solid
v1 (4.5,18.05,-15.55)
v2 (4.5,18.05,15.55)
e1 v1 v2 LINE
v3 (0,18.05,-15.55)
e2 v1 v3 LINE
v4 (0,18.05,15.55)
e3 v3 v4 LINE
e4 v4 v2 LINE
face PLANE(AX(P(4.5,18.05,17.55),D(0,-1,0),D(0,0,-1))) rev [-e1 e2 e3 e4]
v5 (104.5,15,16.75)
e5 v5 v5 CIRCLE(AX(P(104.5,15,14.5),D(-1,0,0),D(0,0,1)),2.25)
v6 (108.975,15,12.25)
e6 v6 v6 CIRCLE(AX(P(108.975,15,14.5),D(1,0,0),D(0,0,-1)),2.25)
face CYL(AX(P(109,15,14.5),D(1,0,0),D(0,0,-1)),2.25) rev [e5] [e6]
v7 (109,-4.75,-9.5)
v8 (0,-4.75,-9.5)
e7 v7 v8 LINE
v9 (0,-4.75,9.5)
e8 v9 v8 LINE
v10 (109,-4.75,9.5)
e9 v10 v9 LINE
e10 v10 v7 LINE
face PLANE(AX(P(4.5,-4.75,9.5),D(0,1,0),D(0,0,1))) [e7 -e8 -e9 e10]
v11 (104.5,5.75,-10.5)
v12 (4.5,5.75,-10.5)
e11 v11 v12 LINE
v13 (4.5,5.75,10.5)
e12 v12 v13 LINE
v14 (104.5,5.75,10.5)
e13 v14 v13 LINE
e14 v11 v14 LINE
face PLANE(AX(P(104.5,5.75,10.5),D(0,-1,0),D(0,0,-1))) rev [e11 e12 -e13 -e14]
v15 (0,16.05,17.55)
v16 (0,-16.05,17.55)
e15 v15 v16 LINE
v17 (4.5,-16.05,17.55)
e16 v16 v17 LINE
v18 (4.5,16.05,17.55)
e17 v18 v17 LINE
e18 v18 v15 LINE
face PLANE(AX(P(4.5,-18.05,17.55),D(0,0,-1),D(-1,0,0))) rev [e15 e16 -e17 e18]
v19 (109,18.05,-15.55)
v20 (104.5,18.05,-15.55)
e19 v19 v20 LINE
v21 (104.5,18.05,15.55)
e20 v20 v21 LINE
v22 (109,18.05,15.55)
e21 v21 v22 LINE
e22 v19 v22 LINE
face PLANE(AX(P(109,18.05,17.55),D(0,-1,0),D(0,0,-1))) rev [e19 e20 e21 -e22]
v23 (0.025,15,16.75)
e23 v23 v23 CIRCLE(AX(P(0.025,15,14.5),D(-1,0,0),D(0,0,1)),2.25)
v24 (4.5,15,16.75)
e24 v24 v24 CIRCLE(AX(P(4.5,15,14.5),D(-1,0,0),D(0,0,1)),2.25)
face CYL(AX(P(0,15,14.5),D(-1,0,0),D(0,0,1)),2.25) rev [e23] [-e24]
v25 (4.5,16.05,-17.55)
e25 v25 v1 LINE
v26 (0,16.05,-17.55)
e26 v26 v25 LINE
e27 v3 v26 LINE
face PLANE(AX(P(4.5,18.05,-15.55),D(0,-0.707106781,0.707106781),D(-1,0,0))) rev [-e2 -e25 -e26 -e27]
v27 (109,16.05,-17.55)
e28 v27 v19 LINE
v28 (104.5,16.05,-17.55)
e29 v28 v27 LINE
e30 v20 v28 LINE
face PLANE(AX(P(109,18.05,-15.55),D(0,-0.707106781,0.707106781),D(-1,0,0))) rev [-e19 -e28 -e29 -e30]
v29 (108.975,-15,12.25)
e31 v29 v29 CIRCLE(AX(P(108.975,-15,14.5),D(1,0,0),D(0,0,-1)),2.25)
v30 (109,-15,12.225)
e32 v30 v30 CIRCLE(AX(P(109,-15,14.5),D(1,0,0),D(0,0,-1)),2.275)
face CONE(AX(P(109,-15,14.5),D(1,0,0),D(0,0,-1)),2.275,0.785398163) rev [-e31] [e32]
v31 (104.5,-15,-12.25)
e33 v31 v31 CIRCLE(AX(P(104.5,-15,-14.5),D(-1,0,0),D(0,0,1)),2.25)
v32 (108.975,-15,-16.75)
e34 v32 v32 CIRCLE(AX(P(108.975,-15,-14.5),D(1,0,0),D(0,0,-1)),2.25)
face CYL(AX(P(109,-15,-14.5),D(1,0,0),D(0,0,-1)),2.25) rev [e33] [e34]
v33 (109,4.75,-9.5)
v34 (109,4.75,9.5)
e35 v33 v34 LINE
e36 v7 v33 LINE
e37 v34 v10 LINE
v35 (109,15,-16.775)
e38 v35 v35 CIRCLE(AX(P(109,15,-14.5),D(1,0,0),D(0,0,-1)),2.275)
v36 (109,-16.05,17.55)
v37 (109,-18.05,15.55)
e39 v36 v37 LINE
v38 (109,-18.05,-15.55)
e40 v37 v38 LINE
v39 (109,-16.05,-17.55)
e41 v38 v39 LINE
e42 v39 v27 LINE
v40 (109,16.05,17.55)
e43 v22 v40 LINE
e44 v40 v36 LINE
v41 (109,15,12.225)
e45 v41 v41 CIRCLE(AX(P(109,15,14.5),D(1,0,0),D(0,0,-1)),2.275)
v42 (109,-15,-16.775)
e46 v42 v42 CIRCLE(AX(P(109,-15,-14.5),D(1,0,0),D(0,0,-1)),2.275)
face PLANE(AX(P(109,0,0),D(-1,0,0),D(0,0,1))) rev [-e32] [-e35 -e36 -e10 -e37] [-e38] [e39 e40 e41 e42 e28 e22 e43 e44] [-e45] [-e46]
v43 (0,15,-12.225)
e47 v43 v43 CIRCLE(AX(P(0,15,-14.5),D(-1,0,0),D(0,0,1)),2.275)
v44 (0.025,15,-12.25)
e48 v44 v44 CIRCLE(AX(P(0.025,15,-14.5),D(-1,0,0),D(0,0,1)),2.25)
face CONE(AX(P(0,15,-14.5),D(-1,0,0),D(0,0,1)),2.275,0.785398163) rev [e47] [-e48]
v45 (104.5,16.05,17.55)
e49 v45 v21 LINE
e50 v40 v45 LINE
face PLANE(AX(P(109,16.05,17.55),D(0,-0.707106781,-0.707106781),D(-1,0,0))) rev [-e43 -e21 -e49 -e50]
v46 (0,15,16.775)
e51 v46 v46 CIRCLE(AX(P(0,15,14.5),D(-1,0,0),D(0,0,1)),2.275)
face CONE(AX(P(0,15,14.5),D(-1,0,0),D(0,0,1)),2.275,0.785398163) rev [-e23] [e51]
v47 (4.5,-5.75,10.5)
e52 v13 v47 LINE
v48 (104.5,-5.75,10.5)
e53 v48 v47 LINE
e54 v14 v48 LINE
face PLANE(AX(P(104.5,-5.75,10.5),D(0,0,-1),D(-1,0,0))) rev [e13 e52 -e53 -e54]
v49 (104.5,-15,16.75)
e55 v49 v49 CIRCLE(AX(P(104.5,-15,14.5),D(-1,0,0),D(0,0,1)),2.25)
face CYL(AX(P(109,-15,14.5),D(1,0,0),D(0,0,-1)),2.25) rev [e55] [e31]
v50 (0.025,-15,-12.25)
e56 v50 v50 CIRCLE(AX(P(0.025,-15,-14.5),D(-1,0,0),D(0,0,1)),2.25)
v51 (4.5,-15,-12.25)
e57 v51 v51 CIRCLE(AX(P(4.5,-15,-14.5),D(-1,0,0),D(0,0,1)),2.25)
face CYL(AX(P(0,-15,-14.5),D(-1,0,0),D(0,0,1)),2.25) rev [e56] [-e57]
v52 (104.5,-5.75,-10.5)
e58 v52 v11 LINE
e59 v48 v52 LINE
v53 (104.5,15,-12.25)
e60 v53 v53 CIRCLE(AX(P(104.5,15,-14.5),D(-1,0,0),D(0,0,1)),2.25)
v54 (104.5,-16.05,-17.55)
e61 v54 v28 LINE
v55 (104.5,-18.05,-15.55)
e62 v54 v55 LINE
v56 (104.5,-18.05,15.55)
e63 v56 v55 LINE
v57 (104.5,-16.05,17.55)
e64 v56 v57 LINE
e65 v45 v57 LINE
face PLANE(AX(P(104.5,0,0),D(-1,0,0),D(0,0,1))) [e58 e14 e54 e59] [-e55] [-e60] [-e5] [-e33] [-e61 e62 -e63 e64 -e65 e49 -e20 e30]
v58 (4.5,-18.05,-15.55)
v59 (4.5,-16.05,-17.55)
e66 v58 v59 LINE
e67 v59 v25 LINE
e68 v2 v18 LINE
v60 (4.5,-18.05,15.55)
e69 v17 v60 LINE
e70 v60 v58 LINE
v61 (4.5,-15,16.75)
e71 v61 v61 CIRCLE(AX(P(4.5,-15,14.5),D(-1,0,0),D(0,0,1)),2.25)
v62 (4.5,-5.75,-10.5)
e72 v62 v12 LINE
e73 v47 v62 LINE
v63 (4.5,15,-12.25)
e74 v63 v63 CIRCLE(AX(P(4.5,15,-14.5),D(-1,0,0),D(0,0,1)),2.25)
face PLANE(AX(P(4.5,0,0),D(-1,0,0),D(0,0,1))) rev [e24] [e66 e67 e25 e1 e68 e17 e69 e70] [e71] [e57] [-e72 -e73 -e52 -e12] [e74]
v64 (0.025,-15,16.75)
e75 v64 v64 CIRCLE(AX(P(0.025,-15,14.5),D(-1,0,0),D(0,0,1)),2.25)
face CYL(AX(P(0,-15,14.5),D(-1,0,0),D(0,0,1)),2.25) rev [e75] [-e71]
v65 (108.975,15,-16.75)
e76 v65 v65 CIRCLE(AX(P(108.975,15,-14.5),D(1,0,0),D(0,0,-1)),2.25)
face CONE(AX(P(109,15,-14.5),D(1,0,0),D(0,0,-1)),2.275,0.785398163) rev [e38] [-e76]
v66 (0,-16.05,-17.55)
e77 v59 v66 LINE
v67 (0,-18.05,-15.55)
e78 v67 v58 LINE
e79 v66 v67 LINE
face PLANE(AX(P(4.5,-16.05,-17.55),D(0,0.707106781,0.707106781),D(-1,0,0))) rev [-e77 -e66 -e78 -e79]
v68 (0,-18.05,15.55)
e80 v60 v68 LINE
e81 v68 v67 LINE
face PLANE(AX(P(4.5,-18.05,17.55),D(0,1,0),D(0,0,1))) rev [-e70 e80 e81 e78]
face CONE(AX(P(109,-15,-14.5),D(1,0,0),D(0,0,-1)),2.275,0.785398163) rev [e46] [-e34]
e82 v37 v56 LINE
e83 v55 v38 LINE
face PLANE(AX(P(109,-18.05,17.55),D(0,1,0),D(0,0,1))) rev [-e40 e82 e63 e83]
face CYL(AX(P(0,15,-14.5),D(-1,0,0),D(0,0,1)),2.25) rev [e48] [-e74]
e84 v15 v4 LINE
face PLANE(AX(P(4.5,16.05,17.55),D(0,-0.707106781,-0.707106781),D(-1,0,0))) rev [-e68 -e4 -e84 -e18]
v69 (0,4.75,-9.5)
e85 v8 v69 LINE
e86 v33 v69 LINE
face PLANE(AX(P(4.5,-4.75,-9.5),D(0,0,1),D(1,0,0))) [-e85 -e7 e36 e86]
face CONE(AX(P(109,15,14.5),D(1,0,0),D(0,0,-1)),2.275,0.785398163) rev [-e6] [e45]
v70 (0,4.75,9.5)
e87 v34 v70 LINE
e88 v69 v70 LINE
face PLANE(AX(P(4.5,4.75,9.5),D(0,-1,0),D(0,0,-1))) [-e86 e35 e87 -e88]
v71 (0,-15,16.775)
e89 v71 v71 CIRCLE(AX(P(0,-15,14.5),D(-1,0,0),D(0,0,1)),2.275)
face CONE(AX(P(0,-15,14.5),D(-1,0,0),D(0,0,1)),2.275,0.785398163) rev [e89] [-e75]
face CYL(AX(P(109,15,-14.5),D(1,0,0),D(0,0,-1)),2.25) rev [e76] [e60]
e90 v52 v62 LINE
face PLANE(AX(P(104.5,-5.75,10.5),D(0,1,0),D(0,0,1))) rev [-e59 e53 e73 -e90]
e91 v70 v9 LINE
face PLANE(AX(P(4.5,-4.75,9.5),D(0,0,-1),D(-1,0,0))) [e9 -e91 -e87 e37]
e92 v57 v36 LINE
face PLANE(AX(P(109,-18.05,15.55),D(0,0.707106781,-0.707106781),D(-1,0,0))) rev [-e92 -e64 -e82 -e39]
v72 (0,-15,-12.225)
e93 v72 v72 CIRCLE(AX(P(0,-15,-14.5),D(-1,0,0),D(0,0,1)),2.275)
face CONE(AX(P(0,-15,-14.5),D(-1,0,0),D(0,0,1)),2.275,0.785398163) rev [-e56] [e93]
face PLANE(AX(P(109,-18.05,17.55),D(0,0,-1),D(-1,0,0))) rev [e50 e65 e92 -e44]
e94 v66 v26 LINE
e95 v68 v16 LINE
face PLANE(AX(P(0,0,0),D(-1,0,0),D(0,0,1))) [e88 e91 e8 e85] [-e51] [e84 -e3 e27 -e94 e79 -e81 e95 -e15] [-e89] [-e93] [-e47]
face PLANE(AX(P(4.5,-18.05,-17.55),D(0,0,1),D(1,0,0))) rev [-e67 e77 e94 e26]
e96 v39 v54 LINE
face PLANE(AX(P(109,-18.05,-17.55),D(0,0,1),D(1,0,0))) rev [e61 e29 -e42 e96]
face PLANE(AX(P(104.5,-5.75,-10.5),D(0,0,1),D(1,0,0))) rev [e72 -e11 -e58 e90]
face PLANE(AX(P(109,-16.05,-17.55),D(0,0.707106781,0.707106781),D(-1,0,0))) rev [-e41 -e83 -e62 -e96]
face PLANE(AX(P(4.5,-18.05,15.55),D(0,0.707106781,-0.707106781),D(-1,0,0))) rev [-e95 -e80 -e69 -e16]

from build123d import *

# Parameters (mm, degrees)
SKETCH_1_W                  = 35.1
SKETCH_1_H                  = 36.1
SKETCH_1_W_2                = 19
SKETCH_1_H_2                = 9.5
EXTRUDE_1_DEPTH             = 4.5
CHAMFER_1_SIZE              = 2
SKETCH_4_W                  = 21
SKETCH_4_H                  = 11.5
SKETCH_4_W_2                = 19
SKETCH_4_H_2                = 9.5
EXTRUDE_2_DEPTH             = 100
SKETCH_5_W                  = 35.1
SKETCH_5_H                  = 36.1
SKETCH_5_W_2                = 19
SKETCH_5_H_2                = 9.5
EXTRUDE_3_DEPTH             = 4.5
CHAMFER_2_SIZE              = 2
PATTERN_LINEAR_1_COUNT      = 2
PATTERN_LINEAR_1_PITCH      = 29
PATTERN_LINEAR_1_COUNT_DIR2 = 2
PATTERN_LINEAR_1_PITCH_DIR2 = 30
HOLE_WIZARD_M42_D           = 4.5
HOLE_WIZARD_M42_CSINK_D     = 4.55
HOLE_WIZARD_M42_CSINK_ANGLE = 90


# Read off the part's stored shape, not the designer's step: Отверстие с зазором M41
with BuildPart() as part:
    # Эскиз1 → Бобышка-Вытянуть1 (new body)
    with BuildSketch(Plane(origin=(0, 0, 0), x_dir=(0, 0, -1), z_dir=(1, 0, 0))):
        Rectangle(SKETCH_1_W, SKETCH_1_H)
        Rectangle(SKETCH_1_W_2, SKETCH_1_H_2, mode=Mode.SUBTRACT)
    extrude(amount=EXTRUDE_1_DEPTH)

    # Фаска1
    chamfer_1_edges = [part.edges().sort_by_distance(p)[0] for p in [
        (2.25, -18.05, -17.55),
        (2.25, -18.05, 17.55),
        (2.25, 18.05, 17.55),
        (2.25, 18.05, -17.55),
    ]]
    chamfer(chamfer_1_edges, length=CHAMFER_1_SIZE)

    # Эскиз4 → Бобышка-Вытянуть2 (add)
    with BuildSketch(Plane(origin=(4.5, 0, 0), x_dir=(0, 0, -1), z_dir=(1, 0, 0))):
        Rectangle(SKETCH_4_W, SKETCH_4_H)
        Rectangle(SKETCH_4_W_2, SKETCH_4_H_2, mode=Mode.SUBTRACT)
    extrude(amount=EXTRUDE_2_DEPTH)

    # Эскиз5 → Бобышка-Вытянуть3 (add)
    with BuildSketch(Plane(origin=(104.5, 0, 0), x_dir=(0, 0, -1), z_dir=(1, 0, 0))):
        Rectangle(SKETCH_5_W, SKETCH_5_H)
        Rectangle(SKETCH_5_W_2, SKETCH_5_H_2, mode=Mode.SUBTRACT)
    extrude(amount=EXTRUDE_3_DEPTH)

    # Фаска2
    chamfer_2_edges = [part.edges().sort_by_distance(p)[0] for p in [
        (106.75, -18.05, -17.55),
        (106.75, 18.05, -17.55),
        (106.75, 18.05, 17.55),
        (106.75, -18.05, 17.55),
    ]]
    chamfer(chamfer_2_edges, length=CHAMFER_2_SIZE)

    # Отверстие с зазором M41 outline → Отверстие с зазором M41 (revolve, cut)
    with BuildSketch(Plane(origin=(0, 15, 14.5), x_dir=(0, 1, 0), z_dir=(0, 0, -1))):
        Polygon((2.25, 0.025), (2.25, 4.5), (0, 4.5), (0, 0), (2.275, 0), align=None)
    hole_wizard_m41 = revolve(axis=Axis((0, 15, 14.5), (1, 0, 0)), mode=Mode.SUBTRACT)

    # Линейный массив1: Hole Wizard M41 2 × 2
    with Locations(*[(0, -j * PATTERN_LINEAR_1_PITCH_DIR2, -i * PATTERN_LINEAR_1_PITCH) for i in range(PATTERN_LINEAR_1_COUNT) for j in range(PATTERN_LINEAR_1_COUNT_DIR2) if (i, j) != (0, 0)]):
        add(hole_wizard_m41, mode=Mode.SUBTRACT)

    # Отверстие с зазором M42 (through all)
    with Locations(Plane(origin=(109, 15, 14.5), x_dir=(0, 0, 1), z_dir=(1, 0, 0))):
        with Locations((0, 0), (-29, 0), (-29, 30), (0, 30)):
            CounterSinkHole(HOLE_WIZARD_M42_D / 2, HOLE_WIZARD_M42_CSINK_D / 2, counter_sink_angle=HOLE_WIZARD_M42_CSINK_ANGLE)


solid = part.part
